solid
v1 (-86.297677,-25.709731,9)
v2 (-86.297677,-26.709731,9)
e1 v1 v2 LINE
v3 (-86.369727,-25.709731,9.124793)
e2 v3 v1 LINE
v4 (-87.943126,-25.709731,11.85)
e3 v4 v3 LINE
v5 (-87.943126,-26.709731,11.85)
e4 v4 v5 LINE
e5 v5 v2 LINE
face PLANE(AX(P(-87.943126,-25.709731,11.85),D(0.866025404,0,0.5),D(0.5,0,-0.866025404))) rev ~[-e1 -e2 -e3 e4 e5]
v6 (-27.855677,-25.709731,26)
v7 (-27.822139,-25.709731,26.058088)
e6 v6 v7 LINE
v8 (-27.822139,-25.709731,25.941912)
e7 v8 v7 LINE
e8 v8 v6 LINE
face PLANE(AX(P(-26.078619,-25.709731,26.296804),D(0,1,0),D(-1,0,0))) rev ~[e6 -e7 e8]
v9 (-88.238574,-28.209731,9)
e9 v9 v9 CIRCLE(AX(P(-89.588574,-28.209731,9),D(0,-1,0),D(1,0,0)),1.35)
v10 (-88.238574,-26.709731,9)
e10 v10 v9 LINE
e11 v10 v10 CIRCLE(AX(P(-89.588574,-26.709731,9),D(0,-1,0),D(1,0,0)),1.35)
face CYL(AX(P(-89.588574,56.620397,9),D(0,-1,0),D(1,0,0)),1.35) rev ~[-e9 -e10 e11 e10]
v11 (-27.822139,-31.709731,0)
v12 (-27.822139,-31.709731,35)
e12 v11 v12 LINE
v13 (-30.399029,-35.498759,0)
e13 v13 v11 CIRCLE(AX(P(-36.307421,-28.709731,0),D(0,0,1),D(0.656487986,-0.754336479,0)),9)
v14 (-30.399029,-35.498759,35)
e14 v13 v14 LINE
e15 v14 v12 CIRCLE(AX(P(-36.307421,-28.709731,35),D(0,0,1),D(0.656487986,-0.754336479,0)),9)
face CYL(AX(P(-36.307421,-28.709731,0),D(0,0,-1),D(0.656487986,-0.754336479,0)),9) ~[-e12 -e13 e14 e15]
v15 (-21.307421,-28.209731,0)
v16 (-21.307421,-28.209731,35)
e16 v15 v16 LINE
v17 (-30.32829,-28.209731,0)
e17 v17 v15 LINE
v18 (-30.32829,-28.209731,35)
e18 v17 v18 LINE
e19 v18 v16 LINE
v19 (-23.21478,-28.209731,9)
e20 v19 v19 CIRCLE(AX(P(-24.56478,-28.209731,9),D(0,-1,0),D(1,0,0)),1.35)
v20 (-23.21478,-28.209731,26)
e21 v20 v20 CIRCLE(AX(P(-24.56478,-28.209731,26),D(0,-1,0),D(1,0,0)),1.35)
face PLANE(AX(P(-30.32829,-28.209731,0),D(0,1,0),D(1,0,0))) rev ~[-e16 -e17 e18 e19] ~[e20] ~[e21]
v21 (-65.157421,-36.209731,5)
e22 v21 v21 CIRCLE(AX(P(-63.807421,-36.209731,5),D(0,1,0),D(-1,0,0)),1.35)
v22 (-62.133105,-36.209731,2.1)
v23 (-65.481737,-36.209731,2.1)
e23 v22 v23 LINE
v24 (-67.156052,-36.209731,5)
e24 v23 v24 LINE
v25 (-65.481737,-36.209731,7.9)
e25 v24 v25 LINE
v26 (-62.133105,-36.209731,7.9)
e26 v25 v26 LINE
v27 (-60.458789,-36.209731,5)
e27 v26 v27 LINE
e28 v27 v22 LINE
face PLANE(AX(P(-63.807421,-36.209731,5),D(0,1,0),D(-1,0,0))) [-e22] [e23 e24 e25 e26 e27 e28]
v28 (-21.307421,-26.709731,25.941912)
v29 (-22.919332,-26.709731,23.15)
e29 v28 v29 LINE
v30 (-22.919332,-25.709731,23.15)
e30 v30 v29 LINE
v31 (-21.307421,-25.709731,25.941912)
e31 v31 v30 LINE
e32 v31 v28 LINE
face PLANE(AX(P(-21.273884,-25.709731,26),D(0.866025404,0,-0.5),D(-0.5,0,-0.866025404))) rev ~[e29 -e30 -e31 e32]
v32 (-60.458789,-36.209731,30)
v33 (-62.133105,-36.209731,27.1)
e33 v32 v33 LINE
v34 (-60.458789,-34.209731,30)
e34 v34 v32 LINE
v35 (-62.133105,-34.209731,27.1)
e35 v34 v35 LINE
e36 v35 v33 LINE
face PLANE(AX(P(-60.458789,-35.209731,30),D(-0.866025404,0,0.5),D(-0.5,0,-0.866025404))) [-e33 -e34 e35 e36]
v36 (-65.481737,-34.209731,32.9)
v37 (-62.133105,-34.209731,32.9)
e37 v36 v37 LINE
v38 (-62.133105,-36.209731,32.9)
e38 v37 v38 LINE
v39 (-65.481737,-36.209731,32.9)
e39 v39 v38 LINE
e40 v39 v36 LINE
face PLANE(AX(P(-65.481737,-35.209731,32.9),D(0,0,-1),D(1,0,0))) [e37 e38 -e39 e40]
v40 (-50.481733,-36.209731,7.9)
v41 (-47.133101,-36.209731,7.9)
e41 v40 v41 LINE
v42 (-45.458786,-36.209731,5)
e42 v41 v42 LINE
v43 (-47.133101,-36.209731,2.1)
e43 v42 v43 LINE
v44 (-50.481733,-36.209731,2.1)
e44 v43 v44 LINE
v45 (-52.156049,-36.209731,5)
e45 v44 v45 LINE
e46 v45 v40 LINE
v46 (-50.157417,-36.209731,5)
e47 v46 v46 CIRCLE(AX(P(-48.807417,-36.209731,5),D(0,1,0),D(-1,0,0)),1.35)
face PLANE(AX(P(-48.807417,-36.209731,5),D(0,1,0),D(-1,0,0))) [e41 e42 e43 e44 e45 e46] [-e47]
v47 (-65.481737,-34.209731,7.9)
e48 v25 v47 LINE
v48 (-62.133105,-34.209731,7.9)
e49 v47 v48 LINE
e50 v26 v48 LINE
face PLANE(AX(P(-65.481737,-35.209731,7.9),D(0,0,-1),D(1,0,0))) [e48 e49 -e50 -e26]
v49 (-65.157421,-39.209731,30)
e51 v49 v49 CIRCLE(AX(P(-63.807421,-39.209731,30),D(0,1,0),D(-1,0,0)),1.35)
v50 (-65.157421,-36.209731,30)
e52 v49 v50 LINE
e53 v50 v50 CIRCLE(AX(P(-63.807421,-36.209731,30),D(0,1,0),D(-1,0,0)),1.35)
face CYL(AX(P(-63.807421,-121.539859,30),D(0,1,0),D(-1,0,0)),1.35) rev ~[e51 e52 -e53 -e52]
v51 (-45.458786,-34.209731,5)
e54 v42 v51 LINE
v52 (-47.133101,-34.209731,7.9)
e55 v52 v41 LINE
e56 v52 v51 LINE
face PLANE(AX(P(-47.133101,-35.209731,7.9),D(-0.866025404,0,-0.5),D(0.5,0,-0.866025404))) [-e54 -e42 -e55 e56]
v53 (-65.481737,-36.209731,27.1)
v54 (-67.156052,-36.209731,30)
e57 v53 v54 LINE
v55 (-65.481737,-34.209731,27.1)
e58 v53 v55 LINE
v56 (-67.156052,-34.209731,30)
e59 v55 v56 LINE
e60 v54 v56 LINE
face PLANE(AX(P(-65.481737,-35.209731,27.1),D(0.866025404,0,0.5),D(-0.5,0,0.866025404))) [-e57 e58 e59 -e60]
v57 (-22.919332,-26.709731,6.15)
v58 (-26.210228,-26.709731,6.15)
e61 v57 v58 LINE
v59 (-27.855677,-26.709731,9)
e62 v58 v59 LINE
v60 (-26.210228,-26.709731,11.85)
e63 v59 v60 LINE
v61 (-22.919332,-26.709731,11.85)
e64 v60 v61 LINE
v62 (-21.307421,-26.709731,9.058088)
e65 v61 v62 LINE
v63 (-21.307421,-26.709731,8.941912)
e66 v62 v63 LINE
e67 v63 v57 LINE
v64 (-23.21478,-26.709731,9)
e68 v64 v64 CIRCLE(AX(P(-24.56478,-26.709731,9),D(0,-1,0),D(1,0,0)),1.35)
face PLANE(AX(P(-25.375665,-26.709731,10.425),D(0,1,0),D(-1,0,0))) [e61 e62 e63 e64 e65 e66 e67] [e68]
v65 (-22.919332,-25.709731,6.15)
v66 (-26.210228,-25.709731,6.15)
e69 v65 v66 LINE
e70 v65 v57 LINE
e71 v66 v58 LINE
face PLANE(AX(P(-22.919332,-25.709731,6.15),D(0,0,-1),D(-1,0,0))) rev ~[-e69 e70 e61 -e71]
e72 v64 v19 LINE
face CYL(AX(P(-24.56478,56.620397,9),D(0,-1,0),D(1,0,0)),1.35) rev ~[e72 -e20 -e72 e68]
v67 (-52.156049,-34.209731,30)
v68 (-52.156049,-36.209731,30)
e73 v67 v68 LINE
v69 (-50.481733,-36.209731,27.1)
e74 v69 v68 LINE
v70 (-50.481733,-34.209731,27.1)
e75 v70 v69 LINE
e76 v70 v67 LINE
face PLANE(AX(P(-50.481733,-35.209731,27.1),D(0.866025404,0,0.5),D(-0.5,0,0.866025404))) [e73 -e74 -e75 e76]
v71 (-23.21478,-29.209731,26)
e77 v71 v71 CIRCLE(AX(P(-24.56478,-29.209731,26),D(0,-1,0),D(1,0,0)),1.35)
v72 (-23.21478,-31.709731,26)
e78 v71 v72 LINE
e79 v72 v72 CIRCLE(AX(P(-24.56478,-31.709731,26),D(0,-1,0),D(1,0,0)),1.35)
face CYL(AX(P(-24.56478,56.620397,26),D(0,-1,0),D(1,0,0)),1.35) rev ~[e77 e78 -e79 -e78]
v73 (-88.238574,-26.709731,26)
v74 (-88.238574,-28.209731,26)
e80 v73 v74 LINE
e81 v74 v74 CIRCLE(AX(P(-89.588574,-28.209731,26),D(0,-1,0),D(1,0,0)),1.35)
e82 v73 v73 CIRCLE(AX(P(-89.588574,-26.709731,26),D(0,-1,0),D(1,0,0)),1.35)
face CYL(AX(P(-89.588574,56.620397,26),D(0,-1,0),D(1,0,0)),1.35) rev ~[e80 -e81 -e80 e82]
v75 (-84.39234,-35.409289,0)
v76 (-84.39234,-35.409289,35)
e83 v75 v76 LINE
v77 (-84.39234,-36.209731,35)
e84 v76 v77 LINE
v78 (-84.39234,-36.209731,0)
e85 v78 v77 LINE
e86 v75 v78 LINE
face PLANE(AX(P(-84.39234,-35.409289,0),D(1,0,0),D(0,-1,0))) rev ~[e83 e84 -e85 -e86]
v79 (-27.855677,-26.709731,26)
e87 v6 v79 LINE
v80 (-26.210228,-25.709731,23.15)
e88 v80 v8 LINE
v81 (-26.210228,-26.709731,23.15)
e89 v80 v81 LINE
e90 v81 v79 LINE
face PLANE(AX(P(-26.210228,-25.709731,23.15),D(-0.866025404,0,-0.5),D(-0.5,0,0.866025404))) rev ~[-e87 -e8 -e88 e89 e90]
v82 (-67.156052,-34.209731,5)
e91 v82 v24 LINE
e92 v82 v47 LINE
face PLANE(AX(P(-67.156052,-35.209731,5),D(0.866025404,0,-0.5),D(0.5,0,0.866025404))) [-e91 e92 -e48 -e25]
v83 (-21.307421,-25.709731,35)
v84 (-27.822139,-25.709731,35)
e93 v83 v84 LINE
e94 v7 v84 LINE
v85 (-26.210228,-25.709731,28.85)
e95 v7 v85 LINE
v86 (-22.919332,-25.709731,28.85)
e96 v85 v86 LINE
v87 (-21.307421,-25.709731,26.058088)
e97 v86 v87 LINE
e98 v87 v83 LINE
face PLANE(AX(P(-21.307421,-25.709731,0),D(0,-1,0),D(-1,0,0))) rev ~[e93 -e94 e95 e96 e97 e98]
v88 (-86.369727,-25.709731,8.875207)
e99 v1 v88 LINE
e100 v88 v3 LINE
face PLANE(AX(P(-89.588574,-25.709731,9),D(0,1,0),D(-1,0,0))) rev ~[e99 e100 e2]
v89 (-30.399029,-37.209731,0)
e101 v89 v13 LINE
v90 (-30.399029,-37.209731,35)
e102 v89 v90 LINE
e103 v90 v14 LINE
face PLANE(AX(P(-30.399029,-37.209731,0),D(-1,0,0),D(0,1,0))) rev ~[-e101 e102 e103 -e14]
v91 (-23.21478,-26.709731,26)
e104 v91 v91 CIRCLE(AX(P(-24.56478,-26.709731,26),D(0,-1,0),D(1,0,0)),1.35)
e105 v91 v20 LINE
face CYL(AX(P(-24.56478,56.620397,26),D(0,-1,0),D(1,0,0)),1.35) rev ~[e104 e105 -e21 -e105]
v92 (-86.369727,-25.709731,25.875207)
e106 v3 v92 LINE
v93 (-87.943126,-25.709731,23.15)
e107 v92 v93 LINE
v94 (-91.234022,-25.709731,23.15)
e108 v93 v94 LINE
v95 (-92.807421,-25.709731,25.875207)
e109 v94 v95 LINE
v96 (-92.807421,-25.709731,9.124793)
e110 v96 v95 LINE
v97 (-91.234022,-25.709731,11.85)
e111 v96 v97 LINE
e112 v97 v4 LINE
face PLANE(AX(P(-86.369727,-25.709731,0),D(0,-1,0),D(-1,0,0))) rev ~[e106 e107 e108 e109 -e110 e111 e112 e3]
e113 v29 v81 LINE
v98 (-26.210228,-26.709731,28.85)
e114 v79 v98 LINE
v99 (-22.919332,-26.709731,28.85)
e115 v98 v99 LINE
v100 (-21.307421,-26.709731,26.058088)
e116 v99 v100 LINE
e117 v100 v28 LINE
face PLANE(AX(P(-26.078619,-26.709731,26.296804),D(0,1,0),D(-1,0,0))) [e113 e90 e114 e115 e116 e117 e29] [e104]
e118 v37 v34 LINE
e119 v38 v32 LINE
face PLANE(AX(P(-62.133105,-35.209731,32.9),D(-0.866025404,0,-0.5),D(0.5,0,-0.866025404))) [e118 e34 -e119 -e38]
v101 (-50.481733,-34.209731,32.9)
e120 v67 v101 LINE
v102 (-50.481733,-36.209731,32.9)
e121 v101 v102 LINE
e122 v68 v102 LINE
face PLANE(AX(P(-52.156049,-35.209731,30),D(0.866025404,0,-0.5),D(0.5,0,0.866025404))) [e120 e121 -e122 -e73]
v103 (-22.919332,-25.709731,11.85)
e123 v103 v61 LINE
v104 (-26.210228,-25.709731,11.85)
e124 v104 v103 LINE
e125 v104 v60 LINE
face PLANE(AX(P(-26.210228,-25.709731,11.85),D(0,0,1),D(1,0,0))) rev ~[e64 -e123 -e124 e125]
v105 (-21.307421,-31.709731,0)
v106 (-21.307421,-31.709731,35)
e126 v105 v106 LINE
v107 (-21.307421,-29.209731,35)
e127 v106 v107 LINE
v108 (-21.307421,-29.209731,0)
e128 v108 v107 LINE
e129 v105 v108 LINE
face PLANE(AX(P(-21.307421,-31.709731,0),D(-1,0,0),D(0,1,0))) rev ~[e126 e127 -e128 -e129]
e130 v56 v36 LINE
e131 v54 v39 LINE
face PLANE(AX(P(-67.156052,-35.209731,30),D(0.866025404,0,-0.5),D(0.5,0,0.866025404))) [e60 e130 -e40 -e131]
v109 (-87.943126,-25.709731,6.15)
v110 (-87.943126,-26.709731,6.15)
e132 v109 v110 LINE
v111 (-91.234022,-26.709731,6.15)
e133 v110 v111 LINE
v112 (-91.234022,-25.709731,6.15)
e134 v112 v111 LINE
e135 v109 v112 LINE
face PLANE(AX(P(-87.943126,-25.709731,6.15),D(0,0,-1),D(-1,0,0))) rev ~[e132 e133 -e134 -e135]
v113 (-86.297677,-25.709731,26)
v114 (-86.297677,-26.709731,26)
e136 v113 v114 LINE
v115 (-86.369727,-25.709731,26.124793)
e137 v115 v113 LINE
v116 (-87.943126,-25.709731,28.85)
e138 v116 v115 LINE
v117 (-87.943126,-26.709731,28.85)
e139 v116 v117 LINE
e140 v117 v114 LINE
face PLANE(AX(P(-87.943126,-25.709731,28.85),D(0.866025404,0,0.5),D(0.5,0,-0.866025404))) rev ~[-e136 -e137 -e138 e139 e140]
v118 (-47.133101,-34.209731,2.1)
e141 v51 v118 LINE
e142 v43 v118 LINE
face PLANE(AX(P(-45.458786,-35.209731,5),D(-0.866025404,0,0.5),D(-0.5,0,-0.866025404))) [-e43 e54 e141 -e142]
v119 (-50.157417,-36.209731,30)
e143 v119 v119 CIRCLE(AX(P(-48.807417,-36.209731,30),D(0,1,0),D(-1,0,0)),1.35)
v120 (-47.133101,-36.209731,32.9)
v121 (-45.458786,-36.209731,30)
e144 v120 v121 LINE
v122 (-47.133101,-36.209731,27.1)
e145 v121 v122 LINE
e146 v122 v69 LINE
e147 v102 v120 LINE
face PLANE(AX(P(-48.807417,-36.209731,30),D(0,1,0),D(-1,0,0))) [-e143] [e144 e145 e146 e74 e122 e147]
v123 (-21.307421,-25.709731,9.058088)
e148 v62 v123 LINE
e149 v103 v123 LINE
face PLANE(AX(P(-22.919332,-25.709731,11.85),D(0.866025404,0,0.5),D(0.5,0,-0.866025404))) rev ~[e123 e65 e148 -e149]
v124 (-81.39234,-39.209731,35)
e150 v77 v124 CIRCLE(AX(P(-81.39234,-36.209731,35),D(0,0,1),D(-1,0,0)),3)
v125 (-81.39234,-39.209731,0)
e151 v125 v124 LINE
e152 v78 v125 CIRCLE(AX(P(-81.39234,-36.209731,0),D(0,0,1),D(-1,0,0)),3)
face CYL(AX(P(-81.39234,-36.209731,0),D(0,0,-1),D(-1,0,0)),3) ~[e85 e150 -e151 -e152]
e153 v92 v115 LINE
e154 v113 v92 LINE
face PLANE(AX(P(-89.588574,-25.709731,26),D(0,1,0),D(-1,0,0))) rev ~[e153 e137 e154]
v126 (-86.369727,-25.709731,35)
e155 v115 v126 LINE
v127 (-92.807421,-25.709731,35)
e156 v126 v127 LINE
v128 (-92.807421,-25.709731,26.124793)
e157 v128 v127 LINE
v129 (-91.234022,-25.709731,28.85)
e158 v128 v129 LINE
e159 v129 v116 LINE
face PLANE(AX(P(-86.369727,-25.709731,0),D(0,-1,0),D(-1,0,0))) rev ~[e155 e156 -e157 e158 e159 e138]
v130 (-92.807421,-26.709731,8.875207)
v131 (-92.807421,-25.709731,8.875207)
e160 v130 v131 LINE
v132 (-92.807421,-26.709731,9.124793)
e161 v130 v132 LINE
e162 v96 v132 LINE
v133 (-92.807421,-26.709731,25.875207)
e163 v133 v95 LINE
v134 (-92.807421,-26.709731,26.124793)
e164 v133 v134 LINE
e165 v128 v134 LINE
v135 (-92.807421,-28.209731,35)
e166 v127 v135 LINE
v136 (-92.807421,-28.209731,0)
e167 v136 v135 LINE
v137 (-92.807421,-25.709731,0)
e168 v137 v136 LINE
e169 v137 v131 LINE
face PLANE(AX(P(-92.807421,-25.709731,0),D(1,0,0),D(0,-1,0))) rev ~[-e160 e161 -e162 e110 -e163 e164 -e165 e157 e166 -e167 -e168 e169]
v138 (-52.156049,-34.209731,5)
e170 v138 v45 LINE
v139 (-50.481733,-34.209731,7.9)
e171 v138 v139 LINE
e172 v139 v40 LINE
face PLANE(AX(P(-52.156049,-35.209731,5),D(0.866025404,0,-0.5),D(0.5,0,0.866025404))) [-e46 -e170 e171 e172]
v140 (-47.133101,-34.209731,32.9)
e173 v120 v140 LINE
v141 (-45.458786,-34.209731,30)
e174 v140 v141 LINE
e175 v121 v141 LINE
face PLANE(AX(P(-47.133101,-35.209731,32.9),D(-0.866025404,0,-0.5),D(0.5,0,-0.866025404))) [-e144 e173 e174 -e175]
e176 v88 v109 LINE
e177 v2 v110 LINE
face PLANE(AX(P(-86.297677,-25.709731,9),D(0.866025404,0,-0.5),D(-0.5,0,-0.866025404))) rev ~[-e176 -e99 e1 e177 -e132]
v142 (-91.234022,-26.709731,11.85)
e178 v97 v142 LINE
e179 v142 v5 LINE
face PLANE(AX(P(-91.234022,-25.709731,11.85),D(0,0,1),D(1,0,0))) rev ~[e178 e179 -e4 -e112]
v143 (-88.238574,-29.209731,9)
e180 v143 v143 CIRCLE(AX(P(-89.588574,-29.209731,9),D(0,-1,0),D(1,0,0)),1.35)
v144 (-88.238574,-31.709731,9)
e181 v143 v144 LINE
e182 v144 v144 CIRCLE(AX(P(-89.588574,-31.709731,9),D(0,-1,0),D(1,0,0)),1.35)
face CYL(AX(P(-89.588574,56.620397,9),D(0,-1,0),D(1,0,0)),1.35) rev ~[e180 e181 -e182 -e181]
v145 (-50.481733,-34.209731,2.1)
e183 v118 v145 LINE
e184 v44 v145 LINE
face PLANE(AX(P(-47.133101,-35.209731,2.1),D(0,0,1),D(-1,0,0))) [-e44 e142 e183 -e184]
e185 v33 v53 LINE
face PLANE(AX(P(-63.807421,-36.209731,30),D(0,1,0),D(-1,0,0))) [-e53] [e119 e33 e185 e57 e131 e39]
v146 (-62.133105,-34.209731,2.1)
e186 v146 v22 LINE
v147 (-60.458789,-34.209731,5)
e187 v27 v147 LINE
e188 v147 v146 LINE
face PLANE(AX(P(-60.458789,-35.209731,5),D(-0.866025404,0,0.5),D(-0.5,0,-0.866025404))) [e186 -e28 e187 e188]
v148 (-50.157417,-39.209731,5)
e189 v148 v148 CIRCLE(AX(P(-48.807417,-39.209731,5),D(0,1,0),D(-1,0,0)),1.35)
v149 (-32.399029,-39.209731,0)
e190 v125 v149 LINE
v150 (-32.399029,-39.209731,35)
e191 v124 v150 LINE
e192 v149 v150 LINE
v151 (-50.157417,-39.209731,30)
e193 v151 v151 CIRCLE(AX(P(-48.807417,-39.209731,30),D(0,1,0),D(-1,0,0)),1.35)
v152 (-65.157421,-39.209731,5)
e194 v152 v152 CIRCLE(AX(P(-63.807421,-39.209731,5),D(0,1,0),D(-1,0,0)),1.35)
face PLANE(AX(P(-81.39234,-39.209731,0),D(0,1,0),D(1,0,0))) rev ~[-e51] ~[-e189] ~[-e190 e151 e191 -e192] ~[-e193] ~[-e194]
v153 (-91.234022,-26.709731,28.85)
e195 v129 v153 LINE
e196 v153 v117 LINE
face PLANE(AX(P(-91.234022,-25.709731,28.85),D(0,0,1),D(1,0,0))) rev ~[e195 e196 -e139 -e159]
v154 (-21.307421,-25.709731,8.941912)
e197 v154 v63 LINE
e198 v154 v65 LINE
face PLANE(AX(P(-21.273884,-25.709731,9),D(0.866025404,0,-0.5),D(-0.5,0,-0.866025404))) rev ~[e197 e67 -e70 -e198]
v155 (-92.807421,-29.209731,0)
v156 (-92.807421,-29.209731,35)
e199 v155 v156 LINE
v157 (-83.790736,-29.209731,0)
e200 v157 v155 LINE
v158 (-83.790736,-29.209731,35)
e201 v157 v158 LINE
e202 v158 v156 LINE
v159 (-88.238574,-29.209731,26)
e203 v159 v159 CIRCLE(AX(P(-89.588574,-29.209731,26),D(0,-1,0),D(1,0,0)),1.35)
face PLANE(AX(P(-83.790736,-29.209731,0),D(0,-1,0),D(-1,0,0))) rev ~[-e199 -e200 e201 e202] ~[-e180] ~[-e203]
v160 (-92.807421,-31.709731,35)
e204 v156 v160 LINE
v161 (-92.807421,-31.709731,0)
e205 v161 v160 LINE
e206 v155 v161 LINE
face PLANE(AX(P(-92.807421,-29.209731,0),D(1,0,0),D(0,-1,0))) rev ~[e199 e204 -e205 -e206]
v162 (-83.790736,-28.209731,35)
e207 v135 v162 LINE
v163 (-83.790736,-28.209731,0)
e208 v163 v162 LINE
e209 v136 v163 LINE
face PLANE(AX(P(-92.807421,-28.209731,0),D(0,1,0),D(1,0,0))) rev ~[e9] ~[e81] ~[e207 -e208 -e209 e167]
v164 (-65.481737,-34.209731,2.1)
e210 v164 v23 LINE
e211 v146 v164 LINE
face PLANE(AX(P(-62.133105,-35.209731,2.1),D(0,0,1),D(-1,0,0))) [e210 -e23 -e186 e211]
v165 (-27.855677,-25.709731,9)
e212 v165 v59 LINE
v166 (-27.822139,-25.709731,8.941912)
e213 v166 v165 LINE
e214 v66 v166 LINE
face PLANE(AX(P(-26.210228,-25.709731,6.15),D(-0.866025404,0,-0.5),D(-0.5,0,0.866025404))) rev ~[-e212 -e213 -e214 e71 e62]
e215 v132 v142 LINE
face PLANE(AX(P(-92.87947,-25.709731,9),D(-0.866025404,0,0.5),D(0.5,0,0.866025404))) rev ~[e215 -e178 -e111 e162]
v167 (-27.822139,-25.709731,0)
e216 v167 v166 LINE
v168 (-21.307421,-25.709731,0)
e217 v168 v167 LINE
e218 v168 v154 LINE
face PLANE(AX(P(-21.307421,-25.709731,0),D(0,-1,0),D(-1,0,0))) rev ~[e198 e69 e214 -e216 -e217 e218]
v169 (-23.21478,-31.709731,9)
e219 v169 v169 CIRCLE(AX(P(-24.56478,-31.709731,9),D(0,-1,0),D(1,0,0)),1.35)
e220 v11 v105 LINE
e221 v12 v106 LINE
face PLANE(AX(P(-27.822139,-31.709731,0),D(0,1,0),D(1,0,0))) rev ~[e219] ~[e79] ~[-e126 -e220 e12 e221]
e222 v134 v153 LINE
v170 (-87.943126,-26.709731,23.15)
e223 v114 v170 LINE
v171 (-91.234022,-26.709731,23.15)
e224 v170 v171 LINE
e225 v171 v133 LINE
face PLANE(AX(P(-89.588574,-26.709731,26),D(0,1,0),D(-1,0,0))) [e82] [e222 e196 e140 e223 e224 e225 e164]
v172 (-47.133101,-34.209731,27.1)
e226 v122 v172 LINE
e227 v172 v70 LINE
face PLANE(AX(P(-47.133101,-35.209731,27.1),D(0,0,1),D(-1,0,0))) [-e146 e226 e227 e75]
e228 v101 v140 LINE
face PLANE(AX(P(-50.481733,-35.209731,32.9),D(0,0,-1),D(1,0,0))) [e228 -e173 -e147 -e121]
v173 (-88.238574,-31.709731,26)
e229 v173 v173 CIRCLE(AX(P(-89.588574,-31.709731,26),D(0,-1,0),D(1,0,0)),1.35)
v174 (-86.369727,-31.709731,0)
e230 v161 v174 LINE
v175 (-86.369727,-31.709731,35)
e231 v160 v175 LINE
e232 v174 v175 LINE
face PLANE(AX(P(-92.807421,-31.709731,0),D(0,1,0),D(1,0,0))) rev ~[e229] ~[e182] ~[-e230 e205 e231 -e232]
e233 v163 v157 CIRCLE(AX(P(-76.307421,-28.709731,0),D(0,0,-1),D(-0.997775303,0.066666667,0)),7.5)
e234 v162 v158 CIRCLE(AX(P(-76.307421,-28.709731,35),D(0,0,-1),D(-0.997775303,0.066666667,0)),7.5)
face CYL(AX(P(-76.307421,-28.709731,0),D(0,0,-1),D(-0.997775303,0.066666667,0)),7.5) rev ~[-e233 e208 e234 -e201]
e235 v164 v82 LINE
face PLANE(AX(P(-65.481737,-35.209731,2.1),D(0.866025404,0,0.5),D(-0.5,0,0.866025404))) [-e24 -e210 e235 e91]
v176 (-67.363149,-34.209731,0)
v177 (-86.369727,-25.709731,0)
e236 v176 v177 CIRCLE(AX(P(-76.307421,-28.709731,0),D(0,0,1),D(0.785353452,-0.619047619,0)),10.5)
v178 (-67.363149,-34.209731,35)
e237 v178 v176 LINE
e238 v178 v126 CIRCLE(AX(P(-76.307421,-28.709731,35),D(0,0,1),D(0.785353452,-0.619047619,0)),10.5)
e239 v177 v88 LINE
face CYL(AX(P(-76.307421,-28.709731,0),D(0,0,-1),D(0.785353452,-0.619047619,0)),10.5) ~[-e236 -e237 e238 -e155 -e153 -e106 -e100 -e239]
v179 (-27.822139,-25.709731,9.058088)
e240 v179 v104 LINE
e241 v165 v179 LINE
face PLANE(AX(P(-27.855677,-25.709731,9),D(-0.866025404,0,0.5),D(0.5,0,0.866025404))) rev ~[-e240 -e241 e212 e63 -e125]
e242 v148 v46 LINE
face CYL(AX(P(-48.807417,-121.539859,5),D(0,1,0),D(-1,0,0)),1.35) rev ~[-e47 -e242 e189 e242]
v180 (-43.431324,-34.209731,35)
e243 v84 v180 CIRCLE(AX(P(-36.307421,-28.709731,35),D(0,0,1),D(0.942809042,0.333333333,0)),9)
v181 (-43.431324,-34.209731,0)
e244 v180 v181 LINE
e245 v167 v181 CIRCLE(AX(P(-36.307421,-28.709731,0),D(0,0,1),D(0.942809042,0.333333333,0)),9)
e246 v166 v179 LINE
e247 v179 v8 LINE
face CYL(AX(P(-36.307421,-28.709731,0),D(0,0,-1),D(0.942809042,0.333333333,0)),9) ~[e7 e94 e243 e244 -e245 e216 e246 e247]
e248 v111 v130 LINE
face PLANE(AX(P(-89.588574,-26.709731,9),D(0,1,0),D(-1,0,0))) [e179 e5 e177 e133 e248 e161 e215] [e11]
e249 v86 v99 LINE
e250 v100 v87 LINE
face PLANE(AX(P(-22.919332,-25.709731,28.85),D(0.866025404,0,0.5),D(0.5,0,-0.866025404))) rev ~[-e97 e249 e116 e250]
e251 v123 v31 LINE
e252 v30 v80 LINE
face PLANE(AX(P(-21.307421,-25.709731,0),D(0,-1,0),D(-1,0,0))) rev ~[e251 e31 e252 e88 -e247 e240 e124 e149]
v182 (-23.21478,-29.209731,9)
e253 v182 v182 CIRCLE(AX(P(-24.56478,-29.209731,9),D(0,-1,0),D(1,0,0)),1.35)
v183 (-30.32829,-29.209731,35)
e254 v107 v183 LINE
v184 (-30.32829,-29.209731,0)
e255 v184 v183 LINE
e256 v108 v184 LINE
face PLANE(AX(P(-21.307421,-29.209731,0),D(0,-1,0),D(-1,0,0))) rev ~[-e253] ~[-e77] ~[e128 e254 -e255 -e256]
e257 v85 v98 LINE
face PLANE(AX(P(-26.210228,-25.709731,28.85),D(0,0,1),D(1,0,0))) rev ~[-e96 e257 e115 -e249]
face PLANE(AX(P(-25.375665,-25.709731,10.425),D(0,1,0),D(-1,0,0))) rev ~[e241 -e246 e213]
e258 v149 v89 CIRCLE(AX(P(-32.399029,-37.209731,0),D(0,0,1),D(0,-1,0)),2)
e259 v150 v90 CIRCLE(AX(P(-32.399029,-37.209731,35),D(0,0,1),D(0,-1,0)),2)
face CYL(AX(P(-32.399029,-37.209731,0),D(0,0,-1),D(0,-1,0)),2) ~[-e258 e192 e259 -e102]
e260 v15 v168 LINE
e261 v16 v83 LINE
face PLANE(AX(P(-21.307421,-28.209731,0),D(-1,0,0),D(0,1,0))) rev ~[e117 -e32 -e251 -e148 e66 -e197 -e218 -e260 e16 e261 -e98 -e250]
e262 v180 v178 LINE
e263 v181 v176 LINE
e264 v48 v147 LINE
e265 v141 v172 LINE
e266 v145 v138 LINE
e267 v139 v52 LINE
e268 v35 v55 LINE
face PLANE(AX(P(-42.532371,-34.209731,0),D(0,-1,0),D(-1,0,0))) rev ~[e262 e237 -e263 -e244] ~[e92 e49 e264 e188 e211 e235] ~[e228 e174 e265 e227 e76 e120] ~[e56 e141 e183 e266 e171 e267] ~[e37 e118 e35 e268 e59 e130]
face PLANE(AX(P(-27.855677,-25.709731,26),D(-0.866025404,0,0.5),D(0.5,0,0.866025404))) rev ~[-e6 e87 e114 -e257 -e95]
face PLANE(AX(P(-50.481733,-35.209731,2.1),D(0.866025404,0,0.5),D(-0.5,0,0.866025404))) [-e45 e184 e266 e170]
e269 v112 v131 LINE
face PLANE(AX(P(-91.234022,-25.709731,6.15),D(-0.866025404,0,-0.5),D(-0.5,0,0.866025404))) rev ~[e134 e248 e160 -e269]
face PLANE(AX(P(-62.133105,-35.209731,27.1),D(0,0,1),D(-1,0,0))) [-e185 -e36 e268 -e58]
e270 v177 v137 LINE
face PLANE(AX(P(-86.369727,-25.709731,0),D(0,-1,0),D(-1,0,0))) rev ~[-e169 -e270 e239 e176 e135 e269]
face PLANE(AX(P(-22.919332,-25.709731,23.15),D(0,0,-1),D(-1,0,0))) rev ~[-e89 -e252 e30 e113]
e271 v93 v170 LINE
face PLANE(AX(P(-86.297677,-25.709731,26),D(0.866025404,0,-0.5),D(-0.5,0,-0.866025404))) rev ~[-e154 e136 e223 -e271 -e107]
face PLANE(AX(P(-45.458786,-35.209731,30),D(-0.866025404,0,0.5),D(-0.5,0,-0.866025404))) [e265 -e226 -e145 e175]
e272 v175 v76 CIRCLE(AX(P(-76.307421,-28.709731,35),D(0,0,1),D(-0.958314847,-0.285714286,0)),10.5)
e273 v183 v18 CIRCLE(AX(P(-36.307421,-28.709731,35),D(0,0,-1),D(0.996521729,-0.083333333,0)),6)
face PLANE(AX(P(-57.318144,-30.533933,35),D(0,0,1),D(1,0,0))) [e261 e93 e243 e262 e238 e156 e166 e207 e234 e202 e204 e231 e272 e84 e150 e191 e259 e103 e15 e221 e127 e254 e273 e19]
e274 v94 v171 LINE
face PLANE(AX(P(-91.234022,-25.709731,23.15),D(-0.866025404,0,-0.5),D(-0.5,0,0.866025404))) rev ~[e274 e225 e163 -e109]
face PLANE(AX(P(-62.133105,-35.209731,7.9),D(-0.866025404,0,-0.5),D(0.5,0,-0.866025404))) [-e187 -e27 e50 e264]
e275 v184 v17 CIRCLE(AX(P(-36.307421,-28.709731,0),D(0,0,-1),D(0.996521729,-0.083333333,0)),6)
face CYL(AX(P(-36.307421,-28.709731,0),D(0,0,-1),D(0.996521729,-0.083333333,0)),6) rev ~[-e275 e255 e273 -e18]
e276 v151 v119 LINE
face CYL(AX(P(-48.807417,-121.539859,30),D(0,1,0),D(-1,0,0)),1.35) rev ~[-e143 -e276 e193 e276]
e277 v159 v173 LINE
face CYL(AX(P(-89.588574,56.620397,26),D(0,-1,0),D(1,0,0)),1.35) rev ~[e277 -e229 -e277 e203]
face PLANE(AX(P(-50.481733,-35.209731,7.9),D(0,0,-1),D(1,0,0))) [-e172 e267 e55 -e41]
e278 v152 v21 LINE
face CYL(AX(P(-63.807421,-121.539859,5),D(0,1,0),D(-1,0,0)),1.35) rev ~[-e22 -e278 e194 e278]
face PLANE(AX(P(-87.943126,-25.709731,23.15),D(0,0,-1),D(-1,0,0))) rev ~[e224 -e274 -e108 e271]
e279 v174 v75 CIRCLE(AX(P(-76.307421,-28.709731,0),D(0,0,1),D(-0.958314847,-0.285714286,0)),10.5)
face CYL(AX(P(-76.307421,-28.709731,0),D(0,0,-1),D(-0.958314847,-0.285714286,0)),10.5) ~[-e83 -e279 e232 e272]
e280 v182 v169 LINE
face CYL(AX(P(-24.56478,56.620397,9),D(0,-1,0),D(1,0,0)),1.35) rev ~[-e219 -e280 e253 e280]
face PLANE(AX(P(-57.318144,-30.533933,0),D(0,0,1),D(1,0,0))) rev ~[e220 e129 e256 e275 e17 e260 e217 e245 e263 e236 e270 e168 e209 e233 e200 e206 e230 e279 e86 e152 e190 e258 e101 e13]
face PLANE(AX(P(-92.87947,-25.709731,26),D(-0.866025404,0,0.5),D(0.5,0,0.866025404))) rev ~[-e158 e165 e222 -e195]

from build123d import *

# Parameters (mm, degrees)
F1_DEPTH   = 35
F3_D       = 2.7
F5_DEPTH   = 1
F6_DEPTH   = 1
F9_D       = 2.7
F9_ON_F7_D = 2.7
F8_W       = 1.6217698948
F8_H       = 2.85
F10_DEPTH  = 1
F11_DEPTH  = 1


# Not quite as in the source:
# - a feature names something its author has since deleted; it is built from what else it names


with BuildPart() as f1:
    # F0 (on Top) → F1 (new body)
    with BuildSketch(Plane.XY):
        with BuildLine():
            Line((-21.3074208284, -25.7097307226), (-27.8221394541, -25.7097307226))
            ThreePointArc((-27.8221394541, -25.7097307226), (-41.1900200037, -21.1492925546), (-42.5323706273, -35.2097307226))
            Line((-42.5323706273, -35.2097307226), (-68.0612095771, -35.2097307226))
            ThreePointArc((-68.0612095771, -35.2097307226), (-71.4714049121, -19.3897012131), (-86.3697267271, -25.7097307226))
            Line((-86.3697267271, -25.7097307226), (-92.8074208284, -25.7097307226))
            Line((-92.8074208284, -25.7097307226), (-92.8074208284, -28.2097307226))
            Line((-92.8074208284, -28.2097307226), (-83.7907356019, -28.2097307226))
            ThreePointArc((-83.7907356019, -28.2097307226), (-68.8074208284, -28.7097307226), (-83.7907356019, -29.2097307226))
            Line((-83.7907356019, -29.2097307226), (-92.8074208284, -29.2097307226))
            Line((-92.8074208284, -29.2097307226), (-92.8074208284, -31.7097307226))
            Line((-92.8074208284, -31.7097307226), (-86.3697267271, -31.7097307226))
            ThreePointArc((-86.3697267271, -31.7097307226), (-85.5676654464, -33.6592629847), (-84.3923404334, -35.4092885424))
            Line((-84.3923404334, -35.4092885424), (-84.3923404334, -36.2097307226))
            ThreePointArc((-84.3923404334, -36.2097307226), (-83.5136607769, -38.3310510662), (-81.3923404334, -39.2097307226))
            Line((-81.3923404334, -39.2097307226), (-32.3990289542, -39.2097307226))
            ThreePointArc((-32.3990289542, -39.2097307226), (-30.9848153918, -38.623944285), (-30.3990289542, -37.2097307226))
            Line((-30.3990289542, -37.2097307226), (-30.3990289542, -35.4987590376))
            ThreePointArc((-30.3990289542, -35.4987590376), (-28.8654021984, -33.7709913079), (-27.8221394541, -31.7097307226))
            Line((-27.8221394541, -31.7097307226), (-21.3074208284, -31.7097307226))
            Line((-21.3074208284, -31.7097307226), (-21.3074208284, -29.2097307226))
            Line((-21.3074208284, -29.2097307226), (-30.3282904568, -29.2097307226))
            ThreePointArc((-30.3282904568, -29.2097307226), (-42.3074208284, -28.7097307226), (-30.3282904568, -28.2097307226))
            Line((-30.3282904568, -28.2097307226), (-21.3074208284, -28.2097307226))
            Line((-21.3074208284, -28.2097307226), (-21.3074208284, -25.7097307226))
        make_face()
    extrude(amount=F1_DEPTH)

    # F3 (through all)
    with Locations(Plane.XZ.offset(39.2097307226)):
        with Locations((-63.8074208284, 30), (-48.80741708, 30), (-48.80741708, 5), (-63.8074208284, 5)):
            Hole(F3_D / 2)

    # F4 (on face) → F5 (cut)
    with BuildSketch(Plane(origin=(0, -35.2097307226, 0), x_dir=(-1, 0, 0), z_dir=(0, 1, 0))):
        Polygon((50.4817328606, 27.1), (52.1560486413, 30), (50.4817328606, 32.9), (47.1331012993, 32.9), (45.4587855187, 30), (47.1331012993, 27.1), align=None)
        Polygon((62.1331050477, 32.9), (60.4587892671, 30), (62.1331050477, 27.1), (65.481736609, 27.1), (67.1560523897, 30), (65.481736609, 32.9), align=None)
        Polygon((52.1560486413, 5), (50.4817328606, 7.9), (47.1331012993, 7.9), (45.4587855187, 5), (47.1331012993, 2.1), (50.4817328606, 2.1), align=None)
        Polygon((62.1331050477, 2.1), (65.481736609, 2.1), (67.1560523897, 5), (65.481736609, 7.9), (62.1331050477, 7.9), (60.4587892671, 5), align=None)
    extrude(amount=-F5_DEPTH, mode=Mode.SUBTRACT)

    # F6 (add): a face of the model
    f6_faces = [f1.faces().sort_by_distance(p)[0] for p in [
        (-55.1452142049, -35.2097307226, 17.5),
    ]]
    extrude(f6_faces, amount=F6_DEPTH)

    # F9 (through all)
    with Locations(Plane(origin=(0, -25.7097307226, 0), x_dir=(-1, 0, 0), z_dir=(0, 1, 0))):
        with Locations((24.5647801412, 26), (24.5647801412, 9)):
            Hole(F9_D / 2)

    # F9 on F7 (through all)
    with Locations(Plane(origin=(0, -25.7097307226, 0), x_dir=(-1, 0, 0), z_dir=(0, 1, 0))):
        with Locations((89.5885737777, 9), (89.5885737777, 26)):
            Hole(F9_ON_F7_D / 2)

    # F8 (on face) → F10 (cut)
    with BuildSketch(Plane(origin=(0, -25.7097307226, 0), x_dir=(-1, 0, 0), z_dir=(0, 1, 0))):
        Polygon((26.2102284084, 28.85), (24.5647801412, 28.85), (24.5647801412, 26), (26.1865500361, 26), (26.1865500361, 23.15), (26.2102284084, 23.15), (27.8556766756, 26), align=None)
        Polygon((24.5647801412, 26), (24.5647801412, 28.85), (22.919331874, 28.85), (21.2738836069, 26), (22.919331874, 23.15), (24.5647801412, 23.15), align=None)
        with Locations((25.3756650887, 10.425)):
            Rectangle(F8_W, F8_H)
        Polygon((24.5647801412, 9), (24.5647801412, 11.85), (22.919331874, 11.85), (21.2738836069, 9), (22.919331874, 6.15), (24.5647801412, 6.15), align=None)
        with Locations((25.3756650887, 24.575)):
            Rectangle(F8_W, F8_H)
        Polygon((26.1865500361, 9), (24.5647801412, 9), (24.5647801412, 6.15), (26.2102284084, 6.15), (27.8556766756, 9), (26.2102284084, 11.85), (26.1865500361, 11.85), align=None)
    extrude(amount=-F10_DEPTH, mode=Mode.SUBTRACT)

    # F7 (on face) → F11 (cut)
    with BuildSketch(Plane(origin=(0, -25.7097307226, 0), x_dir=(-1, 0, 0), z_dir=(0, 1, 0))):
        Polygon((91.2340220449, 6.15), (92.8794703121, 9), (91.2340220449, 11.85), (87.9431255105, 11.85), (86.2976772433, 9), (87.9431255105, 6.15), align=None)
        Polygon((92.8794703121, 26), (91.2340220449, 28.85), (87.9431255105, 28.85), (86.2976772433, 26), (87.9431255105, 23.15), (91.2340220449, 23.15), align=None)
    extrude(amount=-F11_DEPTH, mode=Mode.SUBTRACT)


solid = f1.part
